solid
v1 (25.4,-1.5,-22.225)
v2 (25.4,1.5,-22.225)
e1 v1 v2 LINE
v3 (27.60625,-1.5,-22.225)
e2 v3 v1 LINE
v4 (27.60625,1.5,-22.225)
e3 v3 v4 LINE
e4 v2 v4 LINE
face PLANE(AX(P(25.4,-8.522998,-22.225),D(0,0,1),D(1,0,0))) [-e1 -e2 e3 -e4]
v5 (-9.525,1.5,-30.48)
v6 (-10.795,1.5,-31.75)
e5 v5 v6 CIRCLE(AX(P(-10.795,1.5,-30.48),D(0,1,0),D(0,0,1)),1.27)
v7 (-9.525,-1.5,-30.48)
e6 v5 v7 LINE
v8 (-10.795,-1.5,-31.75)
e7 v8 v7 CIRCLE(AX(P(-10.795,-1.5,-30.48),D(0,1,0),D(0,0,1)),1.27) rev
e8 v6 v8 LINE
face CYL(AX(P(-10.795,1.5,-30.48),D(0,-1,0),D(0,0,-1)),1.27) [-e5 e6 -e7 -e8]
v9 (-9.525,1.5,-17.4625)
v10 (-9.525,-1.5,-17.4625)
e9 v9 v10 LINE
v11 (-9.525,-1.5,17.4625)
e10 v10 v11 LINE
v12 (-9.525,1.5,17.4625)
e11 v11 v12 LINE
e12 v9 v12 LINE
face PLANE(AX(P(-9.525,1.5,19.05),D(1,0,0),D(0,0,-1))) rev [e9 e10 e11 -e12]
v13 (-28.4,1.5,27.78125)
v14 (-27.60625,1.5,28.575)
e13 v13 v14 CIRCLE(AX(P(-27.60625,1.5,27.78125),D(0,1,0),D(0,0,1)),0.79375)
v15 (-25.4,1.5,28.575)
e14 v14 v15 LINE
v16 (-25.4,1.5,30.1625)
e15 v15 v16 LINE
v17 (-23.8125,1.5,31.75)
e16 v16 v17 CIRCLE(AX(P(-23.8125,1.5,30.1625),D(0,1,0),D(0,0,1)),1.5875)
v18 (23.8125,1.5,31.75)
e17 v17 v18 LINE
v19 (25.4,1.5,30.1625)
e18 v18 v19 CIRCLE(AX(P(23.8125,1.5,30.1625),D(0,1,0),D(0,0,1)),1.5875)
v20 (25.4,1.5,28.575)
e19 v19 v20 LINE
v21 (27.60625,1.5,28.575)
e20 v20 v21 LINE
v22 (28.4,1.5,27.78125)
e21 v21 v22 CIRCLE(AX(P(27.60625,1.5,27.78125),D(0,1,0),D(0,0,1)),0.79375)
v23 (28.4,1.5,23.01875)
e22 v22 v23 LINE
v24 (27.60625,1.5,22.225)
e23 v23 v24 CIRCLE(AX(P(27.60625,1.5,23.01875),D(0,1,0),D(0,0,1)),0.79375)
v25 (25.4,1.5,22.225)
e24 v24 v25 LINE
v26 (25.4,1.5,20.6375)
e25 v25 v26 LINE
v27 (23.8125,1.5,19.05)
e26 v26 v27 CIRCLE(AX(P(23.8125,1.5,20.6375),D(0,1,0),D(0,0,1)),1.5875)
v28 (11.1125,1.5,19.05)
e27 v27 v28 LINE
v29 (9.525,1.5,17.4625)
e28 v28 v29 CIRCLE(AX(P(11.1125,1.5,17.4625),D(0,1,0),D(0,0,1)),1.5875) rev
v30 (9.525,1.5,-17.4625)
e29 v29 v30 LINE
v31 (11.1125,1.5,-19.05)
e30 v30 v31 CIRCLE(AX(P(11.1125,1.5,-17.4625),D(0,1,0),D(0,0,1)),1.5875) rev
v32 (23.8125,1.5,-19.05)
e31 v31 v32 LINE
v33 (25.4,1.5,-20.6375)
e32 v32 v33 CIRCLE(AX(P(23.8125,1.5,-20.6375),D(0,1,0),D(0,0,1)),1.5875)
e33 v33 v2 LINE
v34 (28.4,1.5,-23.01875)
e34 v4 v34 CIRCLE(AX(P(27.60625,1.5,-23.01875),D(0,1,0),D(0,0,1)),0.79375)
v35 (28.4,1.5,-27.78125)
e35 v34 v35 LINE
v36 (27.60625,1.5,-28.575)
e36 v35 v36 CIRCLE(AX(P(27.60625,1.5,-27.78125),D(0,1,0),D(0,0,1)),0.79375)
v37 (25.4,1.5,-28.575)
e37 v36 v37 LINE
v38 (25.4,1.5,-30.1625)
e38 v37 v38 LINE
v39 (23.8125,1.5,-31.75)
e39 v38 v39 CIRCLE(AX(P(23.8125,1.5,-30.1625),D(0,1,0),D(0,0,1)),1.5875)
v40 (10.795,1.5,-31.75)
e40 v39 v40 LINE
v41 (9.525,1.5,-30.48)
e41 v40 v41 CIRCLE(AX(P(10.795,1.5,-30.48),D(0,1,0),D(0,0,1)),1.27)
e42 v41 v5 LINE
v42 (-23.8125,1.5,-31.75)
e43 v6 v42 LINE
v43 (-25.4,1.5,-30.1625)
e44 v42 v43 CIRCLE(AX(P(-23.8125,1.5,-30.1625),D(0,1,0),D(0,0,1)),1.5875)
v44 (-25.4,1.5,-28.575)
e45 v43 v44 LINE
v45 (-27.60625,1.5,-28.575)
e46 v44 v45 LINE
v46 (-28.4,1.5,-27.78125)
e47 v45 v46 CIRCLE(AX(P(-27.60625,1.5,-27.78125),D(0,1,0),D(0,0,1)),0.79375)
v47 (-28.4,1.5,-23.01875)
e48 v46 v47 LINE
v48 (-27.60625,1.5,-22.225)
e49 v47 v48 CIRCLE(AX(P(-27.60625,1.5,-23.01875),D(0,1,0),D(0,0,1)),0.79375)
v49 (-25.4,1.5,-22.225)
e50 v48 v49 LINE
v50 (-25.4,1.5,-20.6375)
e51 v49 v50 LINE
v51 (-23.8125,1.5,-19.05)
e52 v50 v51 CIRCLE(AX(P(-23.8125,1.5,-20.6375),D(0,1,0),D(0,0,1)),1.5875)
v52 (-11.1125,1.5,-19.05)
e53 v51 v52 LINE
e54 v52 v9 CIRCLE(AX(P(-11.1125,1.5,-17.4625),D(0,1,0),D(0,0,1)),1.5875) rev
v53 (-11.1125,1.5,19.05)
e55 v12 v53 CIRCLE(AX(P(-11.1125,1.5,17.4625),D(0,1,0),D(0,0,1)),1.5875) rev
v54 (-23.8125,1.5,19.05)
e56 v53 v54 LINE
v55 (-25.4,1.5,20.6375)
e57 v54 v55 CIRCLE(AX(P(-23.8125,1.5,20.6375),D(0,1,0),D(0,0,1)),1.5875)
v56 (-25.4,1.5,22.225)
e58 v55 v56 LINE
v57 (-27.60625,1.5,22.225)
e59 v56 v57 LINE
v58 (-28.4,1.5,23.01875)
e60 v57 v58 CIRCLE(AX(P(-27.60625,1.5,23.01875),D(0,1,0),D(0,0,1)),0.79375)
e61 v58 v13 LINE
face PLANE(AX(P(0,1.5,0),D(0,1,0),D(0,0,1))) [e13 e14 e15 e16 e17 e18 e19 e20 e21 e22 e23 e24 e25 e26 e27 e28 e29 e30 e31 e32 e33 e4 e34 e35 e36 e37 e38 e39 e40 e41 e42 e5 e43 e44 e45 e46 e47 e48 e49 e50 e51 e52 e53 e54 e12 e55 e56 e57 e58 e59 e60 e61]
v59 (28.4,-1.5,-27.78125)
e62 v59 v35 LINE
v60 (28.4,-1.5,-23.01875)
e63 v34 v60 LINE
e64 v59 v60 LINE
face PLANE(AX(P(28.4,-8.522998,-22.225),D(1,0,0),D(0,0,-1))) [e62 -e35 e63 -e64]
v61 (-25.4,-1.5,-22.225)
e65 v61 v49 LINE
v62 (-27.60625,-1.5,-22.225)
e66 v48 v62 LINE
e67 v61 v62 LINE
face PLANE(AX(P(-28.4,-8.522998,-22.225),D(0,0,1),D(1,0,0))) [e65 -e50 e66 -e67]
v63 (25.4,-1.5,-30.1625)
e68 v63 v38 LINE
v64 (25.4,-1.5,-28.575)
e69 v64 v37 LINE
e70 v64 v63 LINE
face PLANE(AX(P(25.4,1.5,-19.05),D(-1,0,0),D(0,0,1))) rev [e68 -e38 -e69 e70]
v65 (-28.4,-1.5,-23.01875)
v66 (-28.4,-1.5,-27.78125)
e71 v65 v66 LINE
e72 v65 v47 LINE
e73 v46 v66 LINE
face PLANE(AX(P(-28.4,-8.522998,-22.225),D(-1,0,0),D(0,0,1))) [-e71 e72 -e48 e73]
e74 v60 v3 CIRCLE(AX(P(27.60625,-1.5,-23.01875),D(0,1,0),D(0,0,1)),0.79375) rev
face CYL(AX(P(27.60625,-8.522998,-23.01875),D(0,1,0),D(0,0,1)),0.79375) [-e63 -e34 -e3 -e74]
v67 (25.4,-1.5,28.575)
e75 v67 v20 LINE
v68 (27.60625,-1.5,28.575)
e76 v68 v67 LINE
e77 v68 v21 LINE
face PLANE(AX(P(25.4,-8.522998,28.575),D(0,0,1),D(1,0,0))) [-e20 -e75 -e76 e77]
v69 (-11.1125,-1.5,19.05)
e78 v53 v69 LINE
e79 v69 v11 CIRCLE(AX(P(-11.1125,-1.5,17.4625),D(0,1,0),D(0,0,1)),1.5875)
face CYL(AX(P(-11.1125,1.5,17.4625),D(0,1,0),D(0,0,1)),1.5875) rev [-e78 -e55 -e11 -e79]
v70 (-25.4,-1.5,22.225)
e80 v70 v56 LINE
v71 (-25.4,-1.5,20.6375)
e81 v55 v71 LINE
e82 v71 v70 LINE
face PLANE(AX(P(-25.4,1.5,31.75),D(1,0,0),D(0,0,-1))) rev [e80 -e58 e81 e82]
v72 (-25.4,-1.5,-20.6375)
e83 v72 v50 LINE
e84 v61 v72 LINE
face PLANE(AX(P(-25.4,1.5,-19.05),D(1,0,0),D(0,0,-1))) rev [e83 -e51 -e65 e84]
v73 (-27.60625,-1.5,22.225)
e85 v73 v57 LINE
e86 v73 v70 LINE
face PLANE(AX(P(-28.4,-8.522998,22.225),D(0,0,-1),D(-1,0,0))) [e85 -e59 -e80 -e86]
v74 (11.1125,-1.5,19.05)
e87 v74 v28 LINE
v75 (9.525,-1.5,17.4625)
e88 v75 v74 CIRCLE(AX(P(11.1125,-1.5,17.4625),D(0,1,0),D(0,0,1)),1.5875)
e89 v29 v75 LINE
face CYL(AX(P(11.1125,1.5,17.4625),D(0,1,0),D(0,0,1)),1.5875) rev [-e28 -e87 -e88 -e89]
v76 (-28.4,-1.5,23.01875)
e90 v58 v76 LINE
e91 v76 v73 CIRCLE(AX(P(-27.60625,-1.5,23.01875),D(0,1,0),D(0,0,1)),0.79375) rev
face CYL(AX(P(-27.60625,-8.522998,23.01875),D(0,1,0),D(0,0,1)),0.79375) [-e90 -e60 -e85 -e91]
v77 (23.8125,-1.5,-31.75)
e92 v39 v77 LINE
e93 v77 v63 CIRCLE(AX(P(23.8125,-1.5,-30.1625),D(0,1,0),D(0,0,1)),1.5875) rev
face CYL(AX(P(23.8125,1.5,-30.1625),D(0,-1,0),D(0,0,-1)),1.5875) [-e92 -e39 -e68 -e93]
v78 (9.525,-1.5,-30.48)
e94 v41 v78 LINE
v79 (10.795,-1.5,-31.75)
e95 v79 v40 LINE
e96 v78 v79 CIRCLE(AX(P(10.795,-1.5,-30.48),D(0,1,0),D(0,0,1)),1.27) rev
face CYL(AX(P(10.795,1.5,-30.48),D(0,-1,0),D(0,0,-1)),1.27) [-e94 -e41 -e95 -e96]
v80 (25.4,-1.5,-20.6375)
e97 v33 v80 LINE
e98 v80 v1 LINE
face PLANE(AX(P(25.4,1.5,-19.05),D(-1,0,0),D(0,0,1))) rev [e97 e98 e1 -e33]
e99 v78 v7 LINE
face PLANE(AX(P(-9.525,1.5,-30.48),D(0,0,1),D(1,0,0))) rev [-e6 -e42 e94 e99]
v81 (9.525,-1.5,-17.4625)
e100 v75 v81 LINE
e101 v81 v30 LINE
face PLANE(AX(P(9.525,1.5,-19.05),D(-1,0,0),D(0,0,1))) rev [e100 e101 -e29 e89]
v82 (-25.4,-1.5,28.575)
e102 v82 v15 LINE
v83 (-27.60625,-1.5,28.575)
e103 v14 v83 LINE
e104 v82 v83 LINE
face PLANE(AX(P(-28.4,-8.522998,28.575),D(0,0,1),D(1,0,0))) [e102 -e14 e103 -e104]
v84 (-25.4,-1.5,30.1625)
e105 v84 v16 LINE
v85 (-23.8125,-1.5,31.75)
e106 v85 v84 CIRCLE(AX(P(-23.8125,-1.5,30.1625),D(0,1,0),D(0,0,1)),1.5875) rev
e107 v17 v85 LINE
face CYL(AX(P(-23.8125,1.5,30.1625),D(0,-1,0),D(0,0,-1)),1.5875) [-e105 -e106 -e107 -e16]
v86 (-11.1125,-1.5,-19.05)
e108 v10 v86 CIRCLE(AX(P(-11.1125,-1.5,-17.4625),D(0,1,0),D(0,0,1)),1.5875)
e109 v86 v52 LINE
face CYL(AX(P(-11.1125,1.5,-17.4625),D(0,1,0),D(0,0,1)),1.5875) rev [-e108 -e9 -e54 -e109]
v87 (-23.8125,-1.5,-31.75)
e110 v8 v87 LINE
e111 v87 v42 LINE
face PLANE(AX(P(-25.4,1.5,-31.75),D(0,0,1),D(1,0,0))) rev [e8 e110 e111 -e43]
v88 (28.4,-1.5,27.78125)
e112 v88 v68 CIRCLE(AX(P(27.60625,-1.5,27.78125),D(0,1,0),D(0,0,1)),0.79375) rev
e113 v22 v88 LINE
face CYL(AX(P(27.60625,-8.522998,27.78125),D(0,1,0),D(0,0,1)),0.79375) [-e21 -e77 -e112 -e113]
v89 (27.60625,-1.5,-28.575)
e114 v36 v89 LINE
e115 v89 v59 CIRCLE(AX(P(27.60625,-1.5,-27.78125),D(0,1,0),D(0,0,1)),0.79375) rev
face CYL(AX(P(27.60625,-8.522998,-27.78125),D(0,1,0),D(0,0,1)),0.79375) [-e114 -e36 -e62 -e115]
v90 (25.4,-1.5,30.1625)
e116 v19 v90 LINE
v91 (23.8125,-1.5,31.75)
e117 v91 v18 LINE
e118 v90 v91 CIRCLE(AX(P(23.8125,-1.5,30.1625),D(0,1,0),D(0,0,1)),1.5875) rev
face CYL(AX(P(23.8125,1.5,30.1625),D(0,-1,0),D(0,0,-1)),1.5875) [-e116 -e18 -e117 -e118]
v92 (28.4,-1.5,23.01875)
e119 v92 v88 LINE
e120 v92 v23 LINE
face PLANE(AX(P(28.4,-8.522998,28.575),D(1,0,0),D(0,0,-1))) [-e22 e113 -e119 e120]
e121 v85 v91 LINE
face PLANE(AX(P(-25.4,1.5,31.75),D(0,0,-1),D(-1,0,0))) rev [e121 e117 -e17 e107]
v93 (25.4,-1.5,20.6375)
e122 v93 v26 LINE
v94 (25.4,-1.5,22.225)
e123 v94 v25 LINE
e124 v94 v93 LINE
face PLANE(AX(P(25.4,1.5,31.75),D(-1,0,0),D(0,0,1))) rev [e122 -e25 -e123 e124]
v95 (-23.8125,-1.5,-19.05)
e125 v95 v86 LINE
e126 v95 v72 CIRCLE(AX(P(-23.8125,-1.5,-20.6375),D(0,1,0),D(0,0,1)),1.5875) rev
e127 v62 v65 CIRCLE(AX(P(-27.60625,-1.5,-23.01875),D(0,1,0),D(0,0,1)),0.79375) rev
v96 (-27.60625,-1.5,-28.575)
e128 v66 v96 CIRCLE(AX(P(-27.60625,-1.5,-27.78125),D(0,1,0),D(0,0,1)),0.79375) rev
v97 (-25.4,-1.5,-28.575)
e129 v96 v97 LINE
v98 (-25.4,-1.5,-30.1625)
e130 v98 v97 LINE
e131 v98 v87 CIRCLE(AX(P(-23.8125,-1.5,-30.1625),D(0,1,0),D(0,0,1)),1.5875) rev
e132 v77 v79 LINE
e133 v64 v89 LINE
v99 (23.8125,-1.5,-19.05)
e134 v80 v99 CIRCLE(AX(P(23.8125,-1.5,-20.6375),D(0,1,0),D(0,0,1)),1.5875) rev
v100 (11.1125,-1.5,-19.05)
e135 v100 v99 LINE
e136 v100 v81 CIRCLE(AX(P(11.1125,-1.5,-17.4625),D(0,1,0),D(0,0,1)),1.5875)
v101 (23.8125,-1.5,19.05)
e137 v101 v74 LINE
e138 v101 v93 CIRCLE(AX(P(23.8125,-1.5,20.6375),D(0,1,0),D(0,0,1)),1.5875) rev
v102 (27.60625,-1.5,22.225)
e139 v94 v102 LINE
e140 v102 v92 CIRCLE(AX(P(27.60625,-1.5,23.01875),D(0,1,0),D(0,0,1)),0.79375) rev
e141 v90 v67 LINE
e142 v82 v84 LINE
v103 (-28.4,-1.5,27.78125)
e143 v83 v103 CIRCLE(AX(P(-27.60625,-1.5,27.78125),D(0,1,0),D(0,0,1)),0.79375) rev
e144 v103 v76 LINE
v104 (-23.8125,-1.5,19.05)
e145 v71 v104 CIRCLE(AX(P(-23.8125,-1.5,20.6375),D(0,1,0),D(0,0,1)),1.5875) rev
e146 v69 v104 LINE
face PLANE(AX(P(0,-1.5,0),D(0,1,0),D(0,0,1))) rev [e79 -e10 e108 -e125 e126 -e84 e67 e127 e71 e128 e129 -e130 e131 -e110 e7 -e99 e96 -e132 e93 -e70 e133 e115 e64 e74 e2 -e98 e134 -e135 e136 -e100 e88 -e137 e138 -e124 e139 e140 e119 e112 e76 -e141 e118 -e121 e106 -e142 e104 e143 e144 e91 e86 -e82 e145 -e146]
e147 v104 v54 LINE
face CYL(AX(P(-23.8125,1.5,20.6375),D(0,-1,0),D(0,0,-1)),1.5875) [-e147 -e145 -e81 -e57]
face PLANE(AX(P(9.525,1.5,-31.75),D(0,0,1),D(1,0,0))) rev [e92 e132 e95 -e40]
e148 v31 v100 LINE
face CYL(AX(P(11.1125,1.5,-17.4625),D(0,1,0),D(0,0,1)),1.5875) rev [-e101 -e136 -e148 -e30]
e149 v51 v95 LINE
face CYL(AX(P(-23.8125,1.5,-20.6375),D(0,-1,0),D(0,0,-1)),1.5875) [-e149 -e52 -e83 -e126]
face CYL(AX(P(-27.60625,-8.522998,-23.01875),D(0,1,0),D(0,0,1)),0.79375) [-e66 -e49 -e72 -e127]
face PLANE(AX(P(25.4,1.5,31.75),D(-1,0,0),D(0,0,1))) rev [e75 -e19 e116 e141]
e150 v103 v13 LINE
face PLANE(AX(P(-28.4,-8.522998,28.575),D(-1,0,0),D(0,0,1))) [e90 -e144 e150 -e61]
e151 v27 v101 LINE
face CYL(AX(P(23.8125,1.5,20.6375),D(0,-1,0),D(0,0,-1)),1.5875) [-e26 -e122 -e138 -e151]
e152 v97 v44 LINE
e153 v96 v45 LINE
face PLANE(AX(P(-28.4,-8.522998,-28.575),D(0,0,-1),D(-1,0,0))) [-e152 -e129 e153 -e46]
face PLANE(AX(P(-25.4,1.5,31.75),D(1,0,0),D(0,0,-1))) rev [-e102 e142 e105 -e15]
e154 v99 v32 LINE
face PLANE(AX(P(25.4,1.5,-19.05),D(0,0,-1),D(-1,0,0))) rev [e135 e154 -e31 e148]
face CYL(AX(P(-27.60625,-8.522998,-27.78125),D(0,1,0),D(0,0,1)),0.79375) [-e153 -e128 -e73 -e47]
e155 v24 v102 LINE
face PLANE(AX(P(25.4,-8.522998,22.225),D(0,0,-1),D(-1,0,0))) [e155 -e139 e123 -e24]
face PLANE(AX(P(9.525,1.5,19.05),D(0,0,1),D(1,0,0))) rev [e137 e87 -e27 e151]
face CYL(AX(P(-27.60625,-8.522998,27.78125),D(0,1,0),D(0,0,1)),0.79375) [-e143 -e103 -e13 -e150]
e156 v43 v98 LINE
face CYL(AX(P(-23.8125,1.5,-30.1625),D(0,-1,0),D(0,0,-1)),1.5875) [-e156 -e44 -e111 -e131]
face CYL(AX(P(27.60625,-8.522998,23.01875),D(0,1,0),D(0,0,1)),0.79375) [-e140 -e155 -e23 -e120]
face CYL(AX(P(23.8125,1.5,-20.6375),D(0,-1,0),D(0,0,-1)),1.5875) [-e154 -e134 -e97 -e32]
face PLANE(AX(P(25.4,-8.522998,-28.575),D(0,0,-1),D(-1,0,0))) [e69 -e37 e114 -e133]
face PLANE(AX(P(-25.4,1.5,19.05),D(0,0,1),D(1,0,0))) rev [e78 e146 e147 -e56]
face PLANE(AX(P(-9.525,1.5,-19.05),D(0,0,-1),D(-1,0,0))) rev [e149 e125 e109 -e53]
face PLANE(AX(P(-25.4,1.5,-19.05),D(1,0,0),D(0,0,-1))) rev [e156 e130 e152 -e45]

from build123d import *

# Parameters (mm, degrees)
BOSS_EXTRUDE1_DEPTH = 1.5
FILLET1_R           = 1.5875
SKETCH2_W           = 3
SKETCH2_H           = 6.35
BOSS_EXTRUDE2_DEPTH = 3
FILLET2_R           = 0.79375
FILLET3_R           = 1.27


with BuildPart() as part:
    # Sketch1 → Boss-Extrude1 (new, symmetric)
    with BuildSketch(Plane(origin=(0, 0, 0), x_dir=(1, 0, 0), z_dir=(0, 1, 0))):
        Polygon((25.4, 19.05), (9.525, 19.05), (9.525, -19.05), (25.4, -19.05), (25.4, -31.75), (-25.4, -31.75), (-25.4, -19.05), (-9.525, -19.05), (-9.525, 19.05), (-25.4, 19.05), (-25.4, 31.75), (-9.525, 31.75), (-9.525, 30.48), (9.525, 30.48), (9.525, 31.75), (25.4, 31.75), align=None)
    extrude(amount=BOSS_EXTRUDE1_DEPTH, both=True)

    # Fillet1
    fillet1_edges = [part.edges().sort_by_distance(p)[0] for p in [
        (25.4, 0, -31.75),
        (25.4, 0, -19.05),
        (9.525, 0, -19.05),
        (9.525, 0, 19.05),
        (25.4, 0, 19.05),
        (25.4, 0, 31.75),
        (-25.4, 0, 31.75),
        (-25.4, 0, 19.05),
        (-9.525, 0, 19.05),
        (-9.525, 0, -19.05),
        (-25.4, 0, -19.05),
        (-25.4, 0, -31.75),
    ]]
    fillet(fillet1_edges, radius=FILLET1_R)

    # Sketch2 → Boss-Extrude2 (add)
    with BuildSketch(Plane(origin=(0, 1.5, 0), x_dir=(1, 0, 0), z_dir=(0, 1, 0))):
        with Locations((-26.9, 25.4)):
            Rectangle(SKETCH2_W, SKETCH2_H)
        with Locations((26.9, 25.4)):
            Rectangle(SKETCH2_W, SKETCH2_H)
        with Locations((26.9, -25.4)):
            Rectangle(SKETCH2_W, SKETCH2_H)
        with Locations((-26.9, -25.4)):
            Rectangle(SKETCH2_W, SKETCH2_H)
    extrude(amount=-BOSS_EXTRUDE2_DEPTH)

    # Fillet2
    fillet2_edges = [part.edges().sort_by_distance(p)[0] for p in [
        (-28.4, 0, 28.575),
        (-28.4, 0, 22.225),
        (28.4, 0, 22.225),
        (28.4, 0, 28.575),
        (28.4, 0, -28.575),
        (28.4, 0, -22.225),
        (-28.4, 0, -22.225),
        (-28.4, 0, -28.575),
    ]]
    fillet(fillet2_edges, radius=FILLET2_R)

    # Fillet3
    fillet3_edges = [part.edges().sort_by_distance(p)[0] for p in [
        (9.525, 0, -31.75),
        (-9.525, 0, -31.75),
    ]]
    fillet(fillet3_edges, radius=FILLET3_R - 0.0001)  # a hair under: the kernel refuses the full size


solid = part.part
